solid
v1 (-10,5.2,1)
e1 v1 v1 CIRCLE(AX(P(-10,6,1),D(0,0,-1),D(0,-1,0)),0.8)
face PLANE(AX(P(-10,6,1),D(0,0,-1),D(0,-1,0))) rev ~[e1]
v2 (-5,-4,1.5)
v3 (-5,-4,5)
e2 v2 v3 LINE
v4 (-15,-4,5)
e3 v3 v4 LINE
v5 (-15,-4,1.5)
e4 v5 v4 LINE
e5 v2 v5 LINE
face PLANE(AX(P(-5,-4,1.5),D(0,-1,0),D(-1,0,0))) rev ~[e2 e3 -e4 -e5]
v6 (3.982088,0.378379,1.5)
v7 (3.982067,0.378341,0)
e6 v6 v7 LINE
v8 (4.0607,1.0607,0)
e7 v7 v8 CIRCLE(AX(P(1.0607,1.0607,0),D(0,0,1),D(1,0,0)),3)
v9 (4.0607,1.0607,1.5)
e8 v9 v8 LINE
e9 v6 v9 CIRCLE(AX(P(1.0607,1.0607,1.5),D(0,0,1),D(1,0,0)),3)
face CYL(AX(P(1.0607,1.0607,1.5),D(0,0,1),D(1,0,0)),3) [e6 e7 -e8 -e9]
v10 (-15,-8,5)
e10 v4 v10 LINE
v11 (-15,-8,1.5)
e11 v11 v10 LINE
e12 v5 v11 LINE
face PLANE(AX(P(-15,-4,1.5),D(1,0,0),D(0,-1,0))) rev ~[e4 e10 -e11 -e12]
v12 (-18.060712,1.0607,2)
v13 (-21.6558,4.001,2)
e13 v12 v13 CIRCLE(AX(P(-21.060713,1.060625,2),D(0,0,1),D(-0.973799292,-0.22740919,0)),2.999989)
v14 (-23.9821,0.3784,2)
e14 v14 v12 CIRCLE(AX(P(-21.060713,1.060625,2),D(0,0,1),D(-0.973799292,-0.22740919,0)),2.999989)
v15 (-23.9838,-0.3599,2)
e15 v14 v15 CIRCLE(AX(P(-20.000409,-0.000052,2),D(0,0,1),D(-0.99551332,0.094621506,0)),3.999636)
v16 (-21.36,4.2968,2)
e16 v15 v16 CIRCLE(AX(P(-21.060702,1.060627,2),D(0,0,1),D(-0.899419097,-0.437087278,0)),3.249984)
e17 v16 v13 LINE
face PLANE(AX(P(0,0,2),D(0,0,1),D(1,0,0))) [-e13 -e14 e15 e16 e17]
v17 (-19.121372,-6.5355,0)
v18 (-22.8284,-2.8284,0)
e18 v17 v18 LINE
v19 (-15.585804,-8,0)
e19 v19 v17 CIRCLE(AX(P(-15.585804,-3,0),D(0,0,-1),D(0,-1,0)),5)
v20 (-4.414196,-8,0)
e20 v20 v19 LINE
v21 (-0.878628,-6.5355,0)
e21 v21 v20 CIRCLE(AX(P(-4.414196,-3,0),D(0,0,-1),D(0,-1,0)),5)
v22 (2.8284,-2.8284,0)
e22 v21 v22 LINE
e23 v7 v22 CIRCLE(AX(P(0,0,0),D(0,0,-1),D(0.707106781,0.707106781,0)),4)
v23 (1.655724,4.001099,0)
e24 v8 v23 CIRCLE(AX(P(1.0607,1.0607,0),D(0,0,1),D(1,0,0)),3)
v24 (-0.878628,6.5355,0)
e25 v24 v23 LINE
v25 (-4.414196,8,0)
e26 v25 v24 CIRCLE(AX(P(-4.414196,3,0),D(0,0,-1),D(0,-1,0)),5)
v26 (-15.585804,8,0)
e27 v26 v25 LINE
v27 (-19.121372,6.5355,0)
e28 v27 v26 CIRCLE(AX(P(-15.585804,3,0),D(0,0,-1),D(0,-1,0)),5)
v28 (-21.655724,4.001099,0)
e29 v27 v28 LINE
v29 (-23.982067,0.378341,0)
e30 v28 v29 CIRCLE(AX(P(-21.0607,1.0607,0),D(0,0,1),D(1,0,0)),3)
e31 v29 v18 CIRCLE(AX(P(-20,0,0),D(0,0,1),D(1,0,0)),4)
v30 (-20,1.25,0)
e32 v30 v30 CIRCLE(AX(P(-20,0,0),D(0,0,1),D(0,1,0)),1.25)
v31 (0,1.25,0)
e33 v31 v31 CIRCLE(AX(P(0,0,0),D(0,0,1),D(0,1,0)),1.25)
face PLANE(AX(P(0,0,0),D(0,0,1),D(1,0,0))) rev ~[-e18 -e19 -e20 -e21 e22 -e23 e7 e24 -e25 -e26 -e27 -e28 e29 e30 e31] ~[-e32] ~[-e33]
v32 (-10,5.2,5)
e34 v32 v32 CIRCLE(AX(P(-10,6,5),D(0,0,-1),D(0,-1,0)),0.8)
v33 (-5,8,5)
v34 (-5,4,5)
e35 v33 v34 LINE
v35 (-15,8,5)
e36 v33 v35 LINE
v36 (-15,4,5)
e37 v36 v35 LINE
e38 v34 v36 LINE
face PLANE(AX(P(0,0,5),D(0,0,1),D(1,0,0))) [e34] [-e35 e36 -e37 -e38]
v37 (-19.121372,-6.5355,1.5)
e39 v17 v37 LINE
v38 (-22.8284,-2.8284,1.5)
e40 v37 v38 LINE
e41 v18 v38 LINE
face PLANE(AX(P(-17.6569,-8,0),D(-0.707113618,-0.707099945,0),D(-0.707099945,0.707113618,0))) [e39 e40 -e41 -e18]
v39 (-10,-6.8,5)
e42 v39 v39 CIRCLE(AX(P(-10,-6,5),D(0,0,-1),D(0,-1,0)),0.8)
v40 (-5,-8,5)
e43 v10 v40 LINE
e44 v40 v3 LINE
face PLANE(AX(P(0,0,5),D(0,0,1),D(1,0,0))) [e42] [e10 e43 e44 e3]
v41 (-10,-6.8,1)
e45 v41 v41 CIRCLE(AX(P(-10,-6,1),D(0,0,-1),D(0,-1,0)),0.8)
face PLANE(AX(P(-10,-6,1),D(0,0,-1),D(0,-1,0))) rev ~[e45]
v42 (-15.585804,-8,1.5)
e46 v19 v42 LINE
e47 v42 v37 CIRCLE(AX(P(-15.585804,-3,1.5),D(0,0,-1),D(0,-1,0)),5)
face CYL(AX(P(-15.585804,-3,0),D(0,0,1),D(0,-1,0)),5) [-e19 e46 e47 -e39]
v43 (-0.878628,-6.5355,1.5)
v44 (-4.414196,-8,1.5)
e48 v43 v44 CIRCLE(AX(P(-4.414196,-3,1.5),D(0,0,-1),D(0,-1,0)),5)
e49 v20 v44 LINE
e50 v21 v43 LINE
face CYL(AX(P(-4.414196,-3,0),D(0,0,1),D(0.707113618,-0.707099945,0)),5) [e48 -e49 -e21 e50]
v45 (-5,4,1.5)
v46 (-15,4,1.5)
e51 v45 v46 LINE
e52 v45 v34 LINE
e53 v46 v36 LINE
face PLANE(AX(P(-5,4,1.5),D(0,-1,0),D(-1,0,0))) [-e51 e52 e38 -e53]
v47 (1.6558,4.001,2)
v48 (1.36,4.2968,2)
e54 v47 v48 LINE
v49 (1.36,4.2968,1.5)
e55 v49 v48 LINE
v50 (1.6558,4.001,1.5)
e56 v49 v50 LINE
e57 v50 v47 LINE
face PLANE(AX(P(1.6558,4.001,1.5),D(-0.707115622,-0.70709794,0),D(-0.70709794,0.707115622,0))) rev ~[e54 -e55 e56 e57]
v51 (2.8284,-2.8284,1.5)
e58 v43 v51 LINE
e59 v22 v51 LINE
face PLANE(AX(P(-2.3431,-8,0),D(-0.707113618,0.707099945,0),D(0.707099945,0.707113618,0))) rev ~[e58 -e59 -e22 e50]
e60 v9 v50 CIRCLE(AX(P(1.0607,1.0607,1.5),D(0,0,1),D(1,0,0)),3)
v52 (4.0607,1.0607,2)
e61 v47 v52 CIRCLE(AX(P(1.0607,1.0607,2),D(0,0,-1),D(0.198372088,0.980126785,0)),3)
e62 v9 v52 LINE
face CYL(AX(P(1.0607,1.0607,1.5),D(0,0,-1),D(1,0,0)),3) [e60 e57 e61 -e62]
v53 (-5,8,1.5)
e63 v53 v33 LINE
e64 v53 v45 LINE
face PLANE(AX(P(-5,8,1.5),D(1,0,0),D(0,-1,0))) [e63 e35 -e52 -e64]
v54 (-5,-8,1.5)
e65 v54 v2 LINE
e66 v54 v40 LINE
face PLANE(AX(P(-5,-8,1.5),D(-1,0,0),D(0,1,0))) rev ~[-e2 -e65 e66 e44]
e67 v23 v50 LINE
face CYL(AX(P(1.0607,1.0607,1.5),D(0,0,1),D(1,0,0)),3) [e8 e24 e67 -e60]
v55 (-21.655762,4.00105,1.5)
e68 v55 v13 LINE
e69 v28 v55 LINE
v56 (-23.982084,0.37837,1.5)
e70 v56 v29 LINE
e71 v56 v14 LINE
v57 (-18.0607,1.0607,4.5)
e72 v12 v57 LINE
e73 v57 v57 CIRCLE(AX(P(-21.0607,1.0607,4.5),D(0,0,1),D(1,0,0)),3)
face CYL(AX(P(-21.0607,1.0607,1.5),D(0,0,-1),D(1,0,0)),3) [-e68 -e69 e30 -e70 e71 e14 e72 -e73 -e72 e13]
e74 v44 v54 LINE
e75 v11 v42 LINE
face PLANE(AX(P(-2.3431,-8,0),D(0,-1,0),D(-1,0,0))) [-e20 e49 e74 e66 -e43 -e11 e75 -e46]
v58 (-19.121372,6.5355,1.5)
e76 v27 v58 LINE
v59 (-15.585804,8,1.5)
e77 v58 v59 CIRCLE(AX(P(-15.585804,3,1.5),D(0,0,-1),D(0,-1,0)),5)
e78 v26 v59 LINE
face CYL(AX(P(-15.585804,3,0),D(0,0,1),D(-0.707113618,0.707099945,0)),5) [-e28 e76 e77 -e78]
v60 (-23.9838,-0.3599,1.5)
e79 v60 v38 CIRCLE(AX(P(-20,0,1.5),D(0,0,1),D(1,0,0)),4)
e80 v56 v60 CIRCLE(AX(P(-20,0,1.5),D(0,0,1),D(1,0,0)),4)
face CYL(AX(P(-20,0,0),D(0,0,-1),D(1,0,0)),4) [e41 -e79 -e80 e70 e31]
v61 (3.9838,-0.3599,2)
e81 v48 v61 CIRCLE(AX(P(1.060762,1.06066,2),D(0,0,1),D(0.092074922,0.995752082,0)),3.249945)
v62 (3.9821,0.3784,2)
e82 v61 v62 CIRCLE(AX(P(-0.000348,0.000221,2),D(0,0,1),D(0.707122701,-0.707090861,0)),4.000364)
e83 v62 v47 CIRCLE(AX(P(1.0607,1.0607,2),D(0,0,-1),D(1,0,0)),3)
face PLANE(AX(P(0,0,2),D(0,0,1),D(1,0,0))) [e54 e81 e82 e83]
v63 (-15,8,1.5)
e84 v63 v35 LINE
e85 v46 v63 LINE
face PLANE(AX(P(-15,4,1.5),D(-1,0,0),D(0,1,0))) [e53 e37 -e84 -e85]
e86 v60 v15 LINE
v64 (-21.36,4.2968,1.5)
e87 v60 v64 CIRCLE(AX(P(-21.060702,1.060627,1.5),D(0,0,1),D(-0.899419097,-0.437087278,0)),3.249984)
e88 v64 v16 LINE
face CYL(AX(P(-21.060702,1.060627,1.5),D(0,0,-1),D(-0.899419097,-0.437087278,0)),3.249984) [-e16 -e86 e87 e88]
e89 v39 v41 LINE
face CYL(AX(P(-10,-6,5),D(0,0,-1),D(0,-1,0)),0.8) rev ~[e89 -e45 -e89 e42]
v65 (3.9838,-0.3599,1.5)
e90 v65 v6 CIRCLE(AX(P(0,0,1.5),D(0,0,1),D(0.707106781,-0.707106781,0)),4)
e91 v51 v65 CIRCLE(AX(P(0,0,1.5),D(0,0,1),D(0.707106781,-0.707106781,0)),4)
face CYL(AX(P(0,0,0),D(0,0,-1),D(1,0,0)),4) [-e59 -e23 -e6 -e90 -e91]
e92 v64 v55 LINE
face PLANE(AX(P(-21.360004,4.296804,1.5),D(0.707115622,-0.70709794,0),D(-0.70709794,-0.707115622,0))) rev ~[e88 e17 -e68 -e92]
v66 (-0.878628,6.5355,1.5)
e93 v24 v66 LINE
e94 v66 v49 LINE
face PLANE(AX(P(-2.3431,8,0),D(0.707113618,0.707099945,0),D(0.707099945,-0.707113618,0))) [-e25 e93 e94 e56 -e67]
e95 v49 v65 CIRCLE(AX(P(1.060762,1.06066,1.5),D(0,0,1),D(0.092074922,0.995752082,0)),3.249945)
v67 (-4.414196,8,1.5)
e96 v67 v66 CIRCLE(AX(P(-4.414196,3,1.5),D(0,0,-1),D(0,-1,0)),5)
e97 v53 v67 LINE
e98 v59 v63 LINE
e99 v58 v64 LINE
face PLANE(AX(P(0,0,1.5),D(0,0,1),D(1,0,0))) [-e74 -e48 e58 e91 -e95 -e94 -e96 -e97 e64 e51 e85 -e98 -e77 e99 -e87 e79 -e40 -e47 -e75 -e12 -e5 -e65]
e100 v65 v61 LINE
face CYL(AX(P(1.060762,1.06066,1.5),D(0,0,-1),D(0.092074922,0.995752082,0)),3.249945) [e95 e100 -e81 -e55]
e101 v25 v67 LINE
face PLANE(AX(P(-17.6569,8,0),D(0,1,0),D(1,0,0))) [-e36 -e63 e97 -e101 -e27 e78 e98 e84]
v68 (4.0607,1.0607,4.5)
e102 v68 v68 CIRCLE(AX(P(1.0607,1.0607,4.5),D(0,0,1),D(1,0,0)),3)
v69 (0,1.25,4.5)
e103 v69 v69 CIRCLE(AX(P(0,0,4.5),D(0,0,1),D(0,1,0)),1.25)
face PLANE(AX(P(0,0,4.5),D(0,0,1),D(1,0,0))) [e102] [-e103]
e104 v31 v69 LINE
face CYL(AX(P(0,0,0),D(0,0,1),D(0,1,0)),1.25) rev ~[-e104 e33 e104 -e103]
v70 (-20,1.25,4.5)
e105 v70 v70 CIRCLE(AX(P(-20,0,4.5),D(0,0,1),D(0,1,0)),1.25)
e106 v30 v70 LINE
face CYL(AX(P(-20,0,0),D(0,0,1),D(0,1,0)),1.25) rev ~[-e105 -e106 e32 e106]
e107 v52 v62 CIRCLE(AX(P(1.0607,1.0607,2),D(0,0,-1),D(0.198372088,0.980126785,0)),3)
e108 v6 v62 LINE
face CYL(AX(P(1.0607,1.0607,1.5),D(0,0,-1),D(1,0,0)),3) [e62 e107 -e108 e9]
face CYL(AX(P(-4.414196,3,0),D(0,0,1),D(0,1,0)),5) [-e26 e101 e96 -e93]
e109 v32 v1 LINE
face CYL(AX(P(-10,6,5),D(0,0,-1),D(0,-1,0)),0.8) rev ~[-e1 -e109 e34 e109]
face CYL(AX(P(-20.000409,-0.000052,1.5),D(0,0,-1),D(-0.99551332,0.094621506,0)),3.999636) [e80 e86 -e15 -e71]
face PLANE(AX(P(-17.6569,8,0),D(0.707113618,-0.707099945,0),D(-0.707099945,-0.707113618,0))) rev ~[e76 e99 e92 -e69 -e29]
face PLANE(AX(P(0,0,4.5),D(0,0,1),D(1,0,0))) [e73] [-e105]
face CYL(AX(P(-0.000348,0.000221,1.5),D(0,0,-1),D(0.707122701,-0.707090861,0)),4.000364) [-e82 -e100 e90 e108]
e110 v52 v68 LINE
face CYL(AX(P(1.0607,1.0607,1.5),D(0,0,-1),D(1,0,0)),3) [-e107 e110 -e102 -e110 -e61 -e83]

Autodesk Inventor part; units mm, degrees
ref_plane "YZ Plane" through (0, 0, 0) normal (1, 0, 0) x (0, 1, 0)
ref_plane "XZ Plane" through (0, 0, 0) normal (0, 1, 0) x (-1, 0, 0)
ref_plane "XY Plane" through (0, 0, 0) normal (0, 0, 1) x (1, 0, 0)
sketch "axes" plane through (0, 0, 0) normal (0, 0, 1) x (1, 0, 0)
  point P0 (0, 0)
  point P1 (0, 0)
  point P2 (-20, 0)
  dimension "d0" = 20
sketch "Sketch2" plane through (0, 0, 0) normal (0, 0, 1) x (1, 0, 0)
  circle A0 centre (-20, 0) radius 4
  circle A1 centre (0, 0) radius 4
  line L0 (-17.6569, 8) -> (-2.3431, 8)
  line L1 (-2.3431, -8) -> (-17.6569, -8)
  line L2 (-17.6569, -8) -> (-22.8284, -2.8284)
  line L3 (-17.6569, 8) -> (-22.8284, 2.8284)
  line L4 (-2.3431, 8) -> (2.8284, 2.8284)
  line L5 (-2.3431, -8) -> (2.8284, -2.8284)
  line L6 (-20, 0) -> (0, 0) construction
  dimension "d1" = 8
  dimension "d2" = 8
  dimension "d3" = 16
  dimension "d4" = 45
  dimension "d5" = 45
extrude "baseplate" add sketch "Sketch2" along normal blind 1.5
sketch "Sketch3" plane through (0, 0, 1.5) normal (0, 0, 1) x (1, 0, 0)
  arc A0 (-22.8284, 2.8284) -> (-22.8284, -2.8284) centre (-20, 0) ccw projected
  line L0 (-22.8284, -2.8284) -> (-17.6569, -8) projected
  line L1 (-17.6569, -8) -> (-2.3431, -8) projected
  line L2 (-2.3431, -8) -> (2.8284, -2.8284) projected
  arc A1 (2.8284, -2.8284) -> (2.8284, 2.8284) centre (0, 0) ccw projected
  line L3 (2.8284, 2.8284) -> (-2.3431, 8) projected
  line L4 (-2.3431, 8) -> (-17.6569, 8) projected
  line L5 (-17.6569, 8) -> (-22.8284, 2.8284) projected
  line L6 (-15, 8) -> (-5, 8)
  line L7 (-5, 8) -> (-5, 4)
  line L8 (-5, 4) -> (-15, 4)
  line L9 (-15, 4) -> (-15, 8)
  line L10 (-15, -8) -> (-5, -8)
  line L11 (-5, -8) -> (-5, -4)
  line L12 (-5, -4) -> (-15, -4)
  line L13 (-15, -4) -> (-15, -8)
  dimension "d8" = 4
  dimension "d9" = 4
  dimension "d10" = 5
  dimension "d11" = 5
  dimension "d12" = 5
  dimension "d13" = 5
extrude "walls" add sketch "Sketch3" along normal blind 3.5 contours L4 L7 L8 L9 | L13 L12 L11 L1
sketch "Sketch5" plane through (0, 0, 5) normal (0, 0, 1) x (1, 0, 0)
  line L0 (-15, -8) -> (-5, -8) projected
  line L1 (-5, -8) -> (-5, -4) projected
  line L2 (-5, -4) -> (-15, -4) projected
  line L3 (-15, -4) -> (-15, -8) projected
  line L4 (-15, 8) -> (-15, 4) projected
  line L5 (-15, 4) -> (-5, 4) projected
  line L6 (-5, 4) -> (-5, 8) projected
  line L7 (-5, 8) -> (-15, 8) projected
  line L8 (-5, -6) -> (-15, -6) construction
  line L9 (-5, 6) -> (-15, 6) construction
  point P0 (0, 0)
  point P1 (-10, -6)
  point P2 (-10, 6)
hole "mounting" at (-10, -6, 5) at (-10, 6, 5) direction (0, 0, -1) diameter 1.6 depth 4
sketch "Sketch6" plane through (0, 0, 1.5) normal (0, 0, 1) x (1, 0, 0)
  circle A0 centre (1.0607, 1.0607) radius 3
  line L0 (0, 0) -> (1.0607, 1.0607) construction
  line L1 (0, 0) -> (7.1773, 0) construction
  dimension "d30" = 45
  dimension "d31" = 1.5
  dimension "d32" = 6
extrude "pip springy" add sketch "Sketch6" along normal blind 3 and the other way blind 1.5
sketch "Sketch10" plane through (0, 0, 1.5) normal (0, 0, 1) x (1, 0, 0)
  circle A0 centre (1.0607, 1.0607) radius 3 projected
  line L0 (1.6558, 4.001) -> (-2.3431, 8) projected
  arc A1 (2.8284, -2.8284) -> (3.9821, 0.3784) centre (0, 0) ccw projected
  arc A2 (1.36, 4.2968) -> (3.9838, -0.3599) centre (1.0607, 1.0607) ccw
  dimension "d50" = 6.5
extrude "Extrusion7" add sketch "Sketch10" along normal blind 0.5
sketch "Sketch8" plane through (0, 0, 1.5) normal (0, 0, 1) x (1, 0, 0)
  line L0 (-25.1045, 0) -> (-20, 0) construction
  line L1 (-20, 0) -> (-24.2709, 4.2709) construction
  circle A0 centre (-21.0607, 1.0607) radius 3
  point P0 (0, 0)
  dimension "d38" = 45
  dimension "d39" = 6
  dimension "d40" = 1.5
extrude "dip springy" add sketch "Sketch8" along normal blind 3 and the other way blind 1.5
sketch "Sketch9" plane through (0, 0, 1.5) normal (0, 0, 1) x (1, 0, 0)
  arc A0 (-23.9821, 0.3784) -> (-21.6558, 4.001) centre (-21.0607, 1.0607) ccw projected
  arc A1 (-23.9838, -0.3599) -> (-21.36, 4.2968) centre (-21.0607, 1.0607) ccw
  line L0 (-17.6569, 8) -> (-21.6558, 4.001) projected
  arc A2 (-23.9821, 0.3784) -> (-22.8284, -2.8284) centre (-20, 0) ccw projected
  point P0 (0, 0)
  dimension "d43" = 6.5
extrude "Extrusion6" add sketch "Sketch9" along normal blind 0.5
sketch "Sketch4" plane through (0, 0, 0) normal (0, 0, -1) x (-1, 0, 0)
  point P0 (20, 0)
  point P1 (0, 0)
hole "joints" at (0, 0, 0) at (-20, 0, 0) direction (0, 0, 1) diameter 2.5 end through all
fillet "Fillet1" radius 5 4 edges at (-2.3431, -8, 0.75) (-17.6569, -8, 0.75) (-17.6569, 8, 0.75) (-2.3431, 8, 0.75)
equation "\"d0\" = PIP_DIP_length"
equation "\"d31\" = PIP_spring_arm"
equation "\"d40\" = DIP_spring_arm"
equation "\"PIP_DIP_length\" = F5_PIP_DIP_length"
equation "\"PIP_spring_arm\" = F5_PIP_spring_arm"
equation "\"DIP_spring_arm\" = F5_DIP_spring_arm"
equation "\"F5_PIP_DIP_length\" = 20"
equation "\"F5_PIP_spring_arm\" = 1.5"
equation "\"F5_DIP_spring_arm\" = 1.5"
properties part number "phalanx 2 R F5"
